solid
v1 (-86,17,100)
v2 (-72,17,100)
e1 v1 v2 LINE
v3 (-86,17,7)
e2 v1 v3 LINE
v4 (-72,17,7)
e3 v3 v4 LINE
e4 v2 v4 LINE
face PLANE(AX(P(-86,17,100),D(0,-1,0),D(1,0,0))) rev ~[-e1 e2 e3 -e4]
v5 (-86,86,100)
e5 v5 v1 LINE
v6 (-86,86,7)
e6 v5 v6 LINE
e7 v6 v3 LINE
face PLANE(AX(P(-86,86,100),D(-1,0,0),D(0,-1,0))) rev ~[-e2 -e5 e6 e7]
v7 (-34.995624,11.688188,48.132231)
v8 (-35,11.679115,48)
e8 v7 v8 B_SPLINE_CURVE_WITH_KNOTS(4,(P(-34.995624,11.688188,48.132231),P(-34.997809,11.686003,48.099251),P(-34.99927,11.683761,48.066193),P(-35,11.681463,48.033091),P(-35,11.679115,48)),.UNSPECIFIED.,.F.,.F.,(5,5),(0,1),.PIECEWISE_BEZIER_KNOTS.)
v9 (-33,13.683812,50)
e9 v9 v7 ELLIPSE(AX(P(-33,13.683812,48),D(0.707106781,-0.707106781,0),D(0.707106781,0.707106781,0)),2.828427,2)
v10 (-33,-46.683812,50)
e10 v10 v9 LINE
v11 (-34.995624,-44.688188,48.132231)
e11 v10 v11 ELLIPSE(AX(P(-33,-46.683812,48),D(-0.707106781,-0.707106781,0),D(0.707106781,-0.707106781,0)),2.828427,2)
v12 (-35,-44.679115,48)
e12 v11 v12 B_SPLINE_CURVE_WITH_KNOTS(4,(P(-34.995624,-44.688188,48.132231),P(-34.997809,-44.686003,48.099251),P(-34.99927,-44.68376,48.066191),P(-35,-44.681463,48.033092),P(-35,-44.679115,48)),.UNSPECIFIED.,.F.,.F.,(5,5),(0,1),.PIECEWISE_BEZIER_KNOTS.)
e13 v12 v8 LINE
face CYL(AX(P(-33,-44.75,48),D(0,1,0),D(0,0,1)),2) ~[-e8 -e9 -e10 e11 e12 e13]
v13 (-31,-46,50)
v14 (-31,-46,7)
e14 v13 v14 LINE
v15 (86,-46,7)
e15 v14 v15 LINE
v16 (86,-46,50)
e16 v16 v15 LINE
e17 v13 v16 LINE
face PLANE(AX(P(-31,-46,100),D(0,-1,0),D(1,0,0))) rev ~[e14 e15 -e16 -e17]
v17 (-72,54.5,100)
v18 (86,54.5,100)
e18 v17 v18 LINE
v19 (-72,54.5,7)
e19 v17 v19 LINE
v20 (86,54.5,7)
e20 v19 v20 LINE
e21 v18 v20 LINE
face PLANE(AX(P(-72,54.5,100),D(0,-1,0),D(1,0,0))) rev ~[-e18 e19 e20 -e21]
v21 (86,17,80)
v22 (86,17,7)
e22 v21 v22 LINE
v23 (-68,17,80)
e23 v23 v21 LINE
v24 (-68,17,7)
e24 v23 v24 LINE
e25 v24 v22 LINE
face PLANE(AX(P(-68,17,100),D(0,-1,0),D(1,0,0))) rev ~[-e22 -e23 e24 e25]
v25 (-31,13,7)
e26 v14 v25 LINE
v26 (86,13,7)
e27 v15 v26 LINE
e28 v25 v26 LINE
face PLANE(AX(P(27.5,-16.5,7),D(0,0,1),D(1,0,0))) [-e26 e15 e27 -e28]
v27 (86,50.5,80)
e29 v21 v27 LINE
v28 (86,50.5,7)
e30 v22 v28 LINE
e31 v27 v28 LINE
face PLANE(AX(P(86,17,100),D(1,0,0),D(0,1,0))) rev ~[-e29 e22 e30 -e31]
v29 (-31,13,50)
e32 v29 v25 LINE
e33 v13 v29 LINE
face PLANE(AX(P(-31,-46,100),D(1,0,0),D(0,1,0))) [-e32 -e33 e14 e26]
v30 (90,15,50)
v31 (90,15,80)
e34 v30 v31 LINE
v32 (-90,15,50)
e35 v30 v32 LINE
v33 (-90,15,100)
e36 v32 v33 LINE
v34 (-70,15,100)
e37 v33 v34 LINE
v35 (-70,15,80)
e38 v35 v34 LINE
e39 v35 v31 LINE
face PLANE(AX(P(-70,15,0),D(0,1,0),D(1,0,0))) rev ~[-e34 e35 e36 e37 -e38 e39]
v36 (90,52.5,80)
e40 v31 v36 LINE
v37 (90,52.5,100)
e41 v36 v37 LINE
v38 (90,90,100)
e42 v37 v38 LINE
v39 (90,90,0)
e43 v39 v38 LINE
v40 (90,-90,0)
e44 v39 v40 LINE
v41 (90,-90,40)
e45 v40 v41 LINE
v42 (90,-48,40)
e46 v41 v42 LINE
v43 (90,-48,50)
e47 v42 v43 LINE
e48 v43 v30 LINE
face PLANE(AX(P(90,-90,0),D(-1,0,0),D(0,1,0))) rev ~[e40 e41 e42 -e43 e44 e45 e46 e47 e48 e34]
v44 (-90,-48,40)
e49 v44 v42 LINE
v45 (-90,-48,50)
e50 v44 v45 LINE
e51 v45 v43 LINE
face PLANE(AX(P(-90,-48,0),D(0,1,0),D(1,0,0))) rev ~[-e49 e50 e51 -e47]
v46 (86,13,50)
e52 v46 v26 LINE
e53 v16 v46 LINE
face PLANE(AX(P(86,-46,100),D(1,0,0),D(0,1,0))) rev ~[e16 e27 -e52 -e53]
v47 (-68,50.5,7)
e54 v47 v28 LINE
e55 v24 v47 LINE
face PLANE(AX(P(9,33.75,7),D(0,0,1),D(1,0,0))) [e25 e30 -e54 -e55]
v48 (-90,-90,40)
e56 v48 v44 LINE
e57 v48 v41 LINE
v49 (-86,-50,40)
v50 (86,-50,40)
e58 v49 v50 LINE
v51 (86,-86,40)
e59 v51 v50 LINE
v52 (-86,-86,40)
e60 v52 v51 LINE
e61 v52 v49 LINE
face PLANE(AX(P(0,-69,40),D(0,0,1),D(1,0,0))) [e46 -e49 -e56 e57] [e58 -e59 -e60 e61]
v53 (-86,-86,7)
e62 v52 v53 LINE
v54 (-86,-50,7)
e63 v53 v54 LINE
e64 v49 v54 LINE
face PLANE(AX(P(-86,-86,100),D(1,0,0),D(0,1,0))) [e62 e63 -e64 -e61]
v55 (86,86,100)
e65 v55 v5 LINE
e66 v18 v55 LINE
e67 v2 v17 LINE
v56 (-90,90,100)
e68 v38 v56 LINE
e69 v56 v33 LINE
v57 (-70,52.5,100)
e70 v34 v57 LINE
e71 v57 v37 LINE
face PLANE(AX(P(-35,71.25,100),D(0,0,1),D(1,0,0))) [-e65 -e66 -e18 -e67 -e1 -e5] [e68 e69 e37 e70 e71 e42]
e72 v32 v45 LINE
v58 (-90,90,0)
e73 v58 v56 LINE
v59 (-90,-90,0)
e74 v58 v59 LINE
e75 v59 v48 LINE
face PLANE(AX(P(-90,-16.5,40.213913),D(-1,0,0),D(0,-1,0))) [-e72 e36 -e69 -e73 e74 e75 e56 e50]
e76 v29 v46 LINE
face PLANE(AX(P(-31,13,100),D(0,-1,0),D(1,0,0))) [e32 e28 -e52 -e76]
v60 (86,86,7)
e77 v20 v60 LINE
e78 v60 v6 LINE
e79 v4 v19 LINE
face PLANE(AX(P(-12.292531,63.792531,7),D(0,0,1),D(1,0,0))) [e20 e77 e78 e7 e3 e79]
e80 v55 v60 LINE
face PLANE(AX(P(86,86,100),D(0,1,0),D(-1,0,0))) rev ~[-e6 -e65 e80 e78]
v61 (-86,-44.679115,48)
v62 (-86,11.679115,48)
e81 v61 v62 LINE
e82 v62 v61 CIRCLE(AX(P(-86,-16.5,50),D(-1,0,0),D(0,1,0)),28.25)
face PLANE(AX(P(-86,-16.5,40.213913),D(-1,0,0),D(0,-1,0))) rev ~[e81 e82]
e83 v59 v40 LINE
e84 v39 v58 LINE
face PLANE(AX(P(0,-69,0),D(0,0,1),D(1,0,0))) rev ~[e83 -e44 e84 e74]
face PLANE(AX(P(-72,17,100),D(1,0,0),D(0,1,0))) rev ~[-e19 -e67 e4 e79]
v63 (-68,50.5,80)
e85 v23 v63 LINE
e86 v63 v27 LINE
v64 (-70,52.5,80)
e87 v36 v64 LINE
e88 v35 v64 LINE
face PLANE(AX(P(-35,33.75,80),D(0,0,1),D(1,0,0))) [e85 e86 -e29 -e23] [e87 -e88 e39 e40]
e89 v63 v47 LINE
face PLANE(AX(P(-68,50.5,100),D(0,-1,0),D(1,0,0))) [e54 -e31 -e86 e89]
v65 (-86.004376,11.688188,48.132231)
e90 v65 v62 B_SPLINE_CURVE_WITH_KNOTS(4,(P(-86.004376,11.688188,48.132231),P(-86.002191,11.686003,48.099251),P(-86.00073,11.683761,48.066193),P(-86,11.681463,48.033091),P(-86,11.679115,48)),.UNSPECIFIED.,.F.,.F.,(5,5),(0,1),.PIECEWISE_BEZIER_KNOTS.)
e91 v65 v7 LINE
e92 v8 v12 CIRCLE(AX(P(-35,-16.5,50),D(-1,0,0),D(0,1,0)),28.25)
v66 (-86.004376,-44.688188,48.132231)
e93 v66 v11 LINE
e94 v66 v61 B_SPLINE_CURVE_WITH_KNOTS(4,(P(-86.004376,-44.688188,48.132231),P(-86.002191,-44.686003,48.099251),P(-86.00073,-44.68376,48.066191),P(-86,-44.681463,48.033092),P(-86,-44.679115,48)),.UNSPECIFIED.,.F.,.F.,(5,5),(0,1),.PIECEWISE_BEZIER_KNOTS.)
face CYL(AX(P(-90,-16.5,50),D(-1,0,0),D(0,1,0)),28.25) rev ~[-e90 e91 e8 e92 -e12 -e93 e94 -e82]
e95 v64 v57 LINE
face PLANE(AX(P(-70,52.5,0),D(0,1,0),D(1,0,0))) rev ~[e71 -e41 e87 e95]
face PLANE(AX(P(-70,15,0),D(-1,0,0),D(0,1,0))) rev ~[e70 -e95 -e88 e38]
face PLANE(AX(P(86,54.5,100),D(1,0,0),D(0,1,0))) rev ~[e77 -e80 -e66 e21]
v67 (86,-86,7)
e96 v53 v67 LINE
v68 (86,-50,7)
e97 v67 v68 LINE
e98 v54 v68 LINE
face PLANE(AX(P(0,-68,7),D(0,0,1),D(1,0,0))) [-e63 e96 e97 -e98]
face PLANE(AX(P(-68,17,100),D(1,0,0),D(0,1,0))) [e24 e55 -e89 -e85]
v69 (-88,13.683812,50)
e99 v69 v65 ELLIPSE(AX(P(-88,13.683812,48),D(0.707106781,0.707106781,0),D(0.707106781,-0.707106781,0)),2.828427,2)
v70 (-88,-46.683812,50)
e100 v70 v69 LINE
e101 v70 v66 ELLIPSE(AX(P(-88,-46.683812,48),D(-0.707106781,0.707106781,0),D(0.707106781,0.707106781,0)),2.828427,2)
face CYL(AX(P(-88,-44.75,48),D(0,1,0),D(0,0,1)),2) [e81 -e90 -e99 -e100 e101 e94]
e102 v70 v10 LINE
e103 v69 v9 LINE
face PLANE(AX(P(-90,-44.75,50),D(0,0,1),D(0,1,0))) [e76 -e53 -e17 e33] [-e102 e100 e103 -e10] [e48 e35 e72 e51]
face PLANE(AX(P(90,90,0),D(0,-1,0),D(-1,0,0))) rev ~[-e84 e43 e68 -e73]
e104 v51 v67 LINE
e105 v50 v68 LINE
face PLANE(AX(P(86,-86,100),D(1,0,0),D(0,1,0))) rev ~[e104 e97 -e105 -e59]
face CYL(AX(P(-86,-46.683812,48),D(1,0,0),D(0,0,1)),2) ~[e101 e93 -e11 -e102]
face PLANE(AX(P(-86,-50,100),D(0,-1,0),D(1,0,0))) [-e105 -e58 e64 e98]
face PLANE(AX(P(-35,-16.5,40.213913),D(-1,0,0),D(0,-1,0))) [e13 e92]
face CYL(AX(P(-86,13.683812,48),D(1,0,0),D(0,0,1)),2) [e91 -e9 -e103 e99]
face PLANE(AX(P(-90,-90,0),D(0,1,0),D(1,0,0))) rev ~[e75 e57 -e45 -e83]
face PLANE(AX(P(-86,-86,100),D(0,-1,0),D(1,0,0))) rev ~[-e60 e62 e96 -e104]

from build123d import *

# Parameters (mm, degrees)
F0_W      = 70
F0_H      = 37.5
F0_W_2    = 90
F1_DEPTH  = 100
F2_DEPTH  = 80
F3_DEPTH  = 50
F0_W_3    = 180
F0_H_2    = 42
F4_DEPTH  = 40
F7_DEPTH  = 55
F8_DEPTH  = 4
F10_R     = 2
F11_W     = 154
F11_H     = 33.5
F11_W_2   = 117
F11_H_2   = 59
F11_W_3   = 172
F11_H_3   = 36
F12_DEPTH = 93


with BuildPart() as f1:
    # F0 (on Top) → F1 (new body)
    with BuildSketch(Plane.XY):
        with Locations((-35, 71.25)):
            Rectangle(F0_W, F0_H)
        with Locations((45, 71.25)):
            Rectangle(F0_W_2, F0_H)
        Polygon((-70, 52.5), (-70, 90), (-90, 90), (-90, 15), (-70, 15), align=None)
    extrude(amount=F1_DEPTH)

    # F0 (on Top) → F2 (join)
    with BuildSketch(Plane.XY):
        with Locations((-35, 33.75)):
            Rectangle(F0_W, F0_H)
        with Locations((45, 33.75)):
            Rectangle(F0_W_2, F0_H)
    extrude(amount=F2_DEPTH)

    # F0 (on Top) → F3 (join)
    with BuildSketch(Plane.XY):
        Polygon((90, -48), (90, 15), (0, 15), (-70, 15), (-90, 15), (-90, -48), align=None)
    extrude(amount=F3_DEPTH)

    # F0 (on Top) → F4 (join)
    with BuildSketch(Plane.XY):
        with Locations((0, -69)):
            Rectangle(F0_W_3, F0_H_2)
    extrude(amount=F4_DEPTH)

    # F6 (on face) → F7 (cut)
    with BuildSketch(Plane(origin=(-90, 0, 0), x_dir=(0, -1, 0), z_dir=(-1, 0, 0))):
        with BuildLine():
            ThreePointArc((-11.75, 50), (16.5, 21.75), (44.75, 50))
            Line((44.75, 50), (-11.75, 50))
        make_face()
    extrude(amount=-F7_DEPTH, mode=Mode.SUBTRACT)

    # F6 (on face) → F8 (join)
    with BuildSketch(Plane(origin=(-90, 0, 0), x_dir=(0, -1, 0), z_dir=(-1, 0, 0))):
        with BuildLine():
            ThreePointArc((-11.75, 50), (16.5, 21.75), (44.75, 50))
            Line((44.75, 50), (-11.75, 50))
        make_face()
    extrude(amount=-F8_DEPTH)

    # F10
    f10_edges = [f1.edges().sort_by_distance(p)[0] for p in [
        (-60.5, 11.75, 50),
        (-35, -16.5, 50),
        (-60.5, -44.75, 50),
        (-86, -16.5, 50),
    ]]
    fillet(f10_edges, radius=F10_R)

    # F11 (on offset) → F12 (cut)
    with BuildSketch(Plane.XY.offset(100)):
        Polygon((-86, 17), (-72, 17), (-72, 52.5), (-72, 54.5), (-70, 54.5), (86, 54.5), (86, 86), (-86, 86), align=None)
        with Locations((9, 33.75)):
            Rectangle(F11_W, F11_H)
        with Locations((27.5, -16.5)):
            Rectangle(F11_W_2, F11_H_2)
        with Locations((0, -68)):
            Rectangle(F11_W_3, F11_H_3)
    extrude(amount=-F12_DEPTH, mode=Mode.SUBTRACT)


solid = f1.part
